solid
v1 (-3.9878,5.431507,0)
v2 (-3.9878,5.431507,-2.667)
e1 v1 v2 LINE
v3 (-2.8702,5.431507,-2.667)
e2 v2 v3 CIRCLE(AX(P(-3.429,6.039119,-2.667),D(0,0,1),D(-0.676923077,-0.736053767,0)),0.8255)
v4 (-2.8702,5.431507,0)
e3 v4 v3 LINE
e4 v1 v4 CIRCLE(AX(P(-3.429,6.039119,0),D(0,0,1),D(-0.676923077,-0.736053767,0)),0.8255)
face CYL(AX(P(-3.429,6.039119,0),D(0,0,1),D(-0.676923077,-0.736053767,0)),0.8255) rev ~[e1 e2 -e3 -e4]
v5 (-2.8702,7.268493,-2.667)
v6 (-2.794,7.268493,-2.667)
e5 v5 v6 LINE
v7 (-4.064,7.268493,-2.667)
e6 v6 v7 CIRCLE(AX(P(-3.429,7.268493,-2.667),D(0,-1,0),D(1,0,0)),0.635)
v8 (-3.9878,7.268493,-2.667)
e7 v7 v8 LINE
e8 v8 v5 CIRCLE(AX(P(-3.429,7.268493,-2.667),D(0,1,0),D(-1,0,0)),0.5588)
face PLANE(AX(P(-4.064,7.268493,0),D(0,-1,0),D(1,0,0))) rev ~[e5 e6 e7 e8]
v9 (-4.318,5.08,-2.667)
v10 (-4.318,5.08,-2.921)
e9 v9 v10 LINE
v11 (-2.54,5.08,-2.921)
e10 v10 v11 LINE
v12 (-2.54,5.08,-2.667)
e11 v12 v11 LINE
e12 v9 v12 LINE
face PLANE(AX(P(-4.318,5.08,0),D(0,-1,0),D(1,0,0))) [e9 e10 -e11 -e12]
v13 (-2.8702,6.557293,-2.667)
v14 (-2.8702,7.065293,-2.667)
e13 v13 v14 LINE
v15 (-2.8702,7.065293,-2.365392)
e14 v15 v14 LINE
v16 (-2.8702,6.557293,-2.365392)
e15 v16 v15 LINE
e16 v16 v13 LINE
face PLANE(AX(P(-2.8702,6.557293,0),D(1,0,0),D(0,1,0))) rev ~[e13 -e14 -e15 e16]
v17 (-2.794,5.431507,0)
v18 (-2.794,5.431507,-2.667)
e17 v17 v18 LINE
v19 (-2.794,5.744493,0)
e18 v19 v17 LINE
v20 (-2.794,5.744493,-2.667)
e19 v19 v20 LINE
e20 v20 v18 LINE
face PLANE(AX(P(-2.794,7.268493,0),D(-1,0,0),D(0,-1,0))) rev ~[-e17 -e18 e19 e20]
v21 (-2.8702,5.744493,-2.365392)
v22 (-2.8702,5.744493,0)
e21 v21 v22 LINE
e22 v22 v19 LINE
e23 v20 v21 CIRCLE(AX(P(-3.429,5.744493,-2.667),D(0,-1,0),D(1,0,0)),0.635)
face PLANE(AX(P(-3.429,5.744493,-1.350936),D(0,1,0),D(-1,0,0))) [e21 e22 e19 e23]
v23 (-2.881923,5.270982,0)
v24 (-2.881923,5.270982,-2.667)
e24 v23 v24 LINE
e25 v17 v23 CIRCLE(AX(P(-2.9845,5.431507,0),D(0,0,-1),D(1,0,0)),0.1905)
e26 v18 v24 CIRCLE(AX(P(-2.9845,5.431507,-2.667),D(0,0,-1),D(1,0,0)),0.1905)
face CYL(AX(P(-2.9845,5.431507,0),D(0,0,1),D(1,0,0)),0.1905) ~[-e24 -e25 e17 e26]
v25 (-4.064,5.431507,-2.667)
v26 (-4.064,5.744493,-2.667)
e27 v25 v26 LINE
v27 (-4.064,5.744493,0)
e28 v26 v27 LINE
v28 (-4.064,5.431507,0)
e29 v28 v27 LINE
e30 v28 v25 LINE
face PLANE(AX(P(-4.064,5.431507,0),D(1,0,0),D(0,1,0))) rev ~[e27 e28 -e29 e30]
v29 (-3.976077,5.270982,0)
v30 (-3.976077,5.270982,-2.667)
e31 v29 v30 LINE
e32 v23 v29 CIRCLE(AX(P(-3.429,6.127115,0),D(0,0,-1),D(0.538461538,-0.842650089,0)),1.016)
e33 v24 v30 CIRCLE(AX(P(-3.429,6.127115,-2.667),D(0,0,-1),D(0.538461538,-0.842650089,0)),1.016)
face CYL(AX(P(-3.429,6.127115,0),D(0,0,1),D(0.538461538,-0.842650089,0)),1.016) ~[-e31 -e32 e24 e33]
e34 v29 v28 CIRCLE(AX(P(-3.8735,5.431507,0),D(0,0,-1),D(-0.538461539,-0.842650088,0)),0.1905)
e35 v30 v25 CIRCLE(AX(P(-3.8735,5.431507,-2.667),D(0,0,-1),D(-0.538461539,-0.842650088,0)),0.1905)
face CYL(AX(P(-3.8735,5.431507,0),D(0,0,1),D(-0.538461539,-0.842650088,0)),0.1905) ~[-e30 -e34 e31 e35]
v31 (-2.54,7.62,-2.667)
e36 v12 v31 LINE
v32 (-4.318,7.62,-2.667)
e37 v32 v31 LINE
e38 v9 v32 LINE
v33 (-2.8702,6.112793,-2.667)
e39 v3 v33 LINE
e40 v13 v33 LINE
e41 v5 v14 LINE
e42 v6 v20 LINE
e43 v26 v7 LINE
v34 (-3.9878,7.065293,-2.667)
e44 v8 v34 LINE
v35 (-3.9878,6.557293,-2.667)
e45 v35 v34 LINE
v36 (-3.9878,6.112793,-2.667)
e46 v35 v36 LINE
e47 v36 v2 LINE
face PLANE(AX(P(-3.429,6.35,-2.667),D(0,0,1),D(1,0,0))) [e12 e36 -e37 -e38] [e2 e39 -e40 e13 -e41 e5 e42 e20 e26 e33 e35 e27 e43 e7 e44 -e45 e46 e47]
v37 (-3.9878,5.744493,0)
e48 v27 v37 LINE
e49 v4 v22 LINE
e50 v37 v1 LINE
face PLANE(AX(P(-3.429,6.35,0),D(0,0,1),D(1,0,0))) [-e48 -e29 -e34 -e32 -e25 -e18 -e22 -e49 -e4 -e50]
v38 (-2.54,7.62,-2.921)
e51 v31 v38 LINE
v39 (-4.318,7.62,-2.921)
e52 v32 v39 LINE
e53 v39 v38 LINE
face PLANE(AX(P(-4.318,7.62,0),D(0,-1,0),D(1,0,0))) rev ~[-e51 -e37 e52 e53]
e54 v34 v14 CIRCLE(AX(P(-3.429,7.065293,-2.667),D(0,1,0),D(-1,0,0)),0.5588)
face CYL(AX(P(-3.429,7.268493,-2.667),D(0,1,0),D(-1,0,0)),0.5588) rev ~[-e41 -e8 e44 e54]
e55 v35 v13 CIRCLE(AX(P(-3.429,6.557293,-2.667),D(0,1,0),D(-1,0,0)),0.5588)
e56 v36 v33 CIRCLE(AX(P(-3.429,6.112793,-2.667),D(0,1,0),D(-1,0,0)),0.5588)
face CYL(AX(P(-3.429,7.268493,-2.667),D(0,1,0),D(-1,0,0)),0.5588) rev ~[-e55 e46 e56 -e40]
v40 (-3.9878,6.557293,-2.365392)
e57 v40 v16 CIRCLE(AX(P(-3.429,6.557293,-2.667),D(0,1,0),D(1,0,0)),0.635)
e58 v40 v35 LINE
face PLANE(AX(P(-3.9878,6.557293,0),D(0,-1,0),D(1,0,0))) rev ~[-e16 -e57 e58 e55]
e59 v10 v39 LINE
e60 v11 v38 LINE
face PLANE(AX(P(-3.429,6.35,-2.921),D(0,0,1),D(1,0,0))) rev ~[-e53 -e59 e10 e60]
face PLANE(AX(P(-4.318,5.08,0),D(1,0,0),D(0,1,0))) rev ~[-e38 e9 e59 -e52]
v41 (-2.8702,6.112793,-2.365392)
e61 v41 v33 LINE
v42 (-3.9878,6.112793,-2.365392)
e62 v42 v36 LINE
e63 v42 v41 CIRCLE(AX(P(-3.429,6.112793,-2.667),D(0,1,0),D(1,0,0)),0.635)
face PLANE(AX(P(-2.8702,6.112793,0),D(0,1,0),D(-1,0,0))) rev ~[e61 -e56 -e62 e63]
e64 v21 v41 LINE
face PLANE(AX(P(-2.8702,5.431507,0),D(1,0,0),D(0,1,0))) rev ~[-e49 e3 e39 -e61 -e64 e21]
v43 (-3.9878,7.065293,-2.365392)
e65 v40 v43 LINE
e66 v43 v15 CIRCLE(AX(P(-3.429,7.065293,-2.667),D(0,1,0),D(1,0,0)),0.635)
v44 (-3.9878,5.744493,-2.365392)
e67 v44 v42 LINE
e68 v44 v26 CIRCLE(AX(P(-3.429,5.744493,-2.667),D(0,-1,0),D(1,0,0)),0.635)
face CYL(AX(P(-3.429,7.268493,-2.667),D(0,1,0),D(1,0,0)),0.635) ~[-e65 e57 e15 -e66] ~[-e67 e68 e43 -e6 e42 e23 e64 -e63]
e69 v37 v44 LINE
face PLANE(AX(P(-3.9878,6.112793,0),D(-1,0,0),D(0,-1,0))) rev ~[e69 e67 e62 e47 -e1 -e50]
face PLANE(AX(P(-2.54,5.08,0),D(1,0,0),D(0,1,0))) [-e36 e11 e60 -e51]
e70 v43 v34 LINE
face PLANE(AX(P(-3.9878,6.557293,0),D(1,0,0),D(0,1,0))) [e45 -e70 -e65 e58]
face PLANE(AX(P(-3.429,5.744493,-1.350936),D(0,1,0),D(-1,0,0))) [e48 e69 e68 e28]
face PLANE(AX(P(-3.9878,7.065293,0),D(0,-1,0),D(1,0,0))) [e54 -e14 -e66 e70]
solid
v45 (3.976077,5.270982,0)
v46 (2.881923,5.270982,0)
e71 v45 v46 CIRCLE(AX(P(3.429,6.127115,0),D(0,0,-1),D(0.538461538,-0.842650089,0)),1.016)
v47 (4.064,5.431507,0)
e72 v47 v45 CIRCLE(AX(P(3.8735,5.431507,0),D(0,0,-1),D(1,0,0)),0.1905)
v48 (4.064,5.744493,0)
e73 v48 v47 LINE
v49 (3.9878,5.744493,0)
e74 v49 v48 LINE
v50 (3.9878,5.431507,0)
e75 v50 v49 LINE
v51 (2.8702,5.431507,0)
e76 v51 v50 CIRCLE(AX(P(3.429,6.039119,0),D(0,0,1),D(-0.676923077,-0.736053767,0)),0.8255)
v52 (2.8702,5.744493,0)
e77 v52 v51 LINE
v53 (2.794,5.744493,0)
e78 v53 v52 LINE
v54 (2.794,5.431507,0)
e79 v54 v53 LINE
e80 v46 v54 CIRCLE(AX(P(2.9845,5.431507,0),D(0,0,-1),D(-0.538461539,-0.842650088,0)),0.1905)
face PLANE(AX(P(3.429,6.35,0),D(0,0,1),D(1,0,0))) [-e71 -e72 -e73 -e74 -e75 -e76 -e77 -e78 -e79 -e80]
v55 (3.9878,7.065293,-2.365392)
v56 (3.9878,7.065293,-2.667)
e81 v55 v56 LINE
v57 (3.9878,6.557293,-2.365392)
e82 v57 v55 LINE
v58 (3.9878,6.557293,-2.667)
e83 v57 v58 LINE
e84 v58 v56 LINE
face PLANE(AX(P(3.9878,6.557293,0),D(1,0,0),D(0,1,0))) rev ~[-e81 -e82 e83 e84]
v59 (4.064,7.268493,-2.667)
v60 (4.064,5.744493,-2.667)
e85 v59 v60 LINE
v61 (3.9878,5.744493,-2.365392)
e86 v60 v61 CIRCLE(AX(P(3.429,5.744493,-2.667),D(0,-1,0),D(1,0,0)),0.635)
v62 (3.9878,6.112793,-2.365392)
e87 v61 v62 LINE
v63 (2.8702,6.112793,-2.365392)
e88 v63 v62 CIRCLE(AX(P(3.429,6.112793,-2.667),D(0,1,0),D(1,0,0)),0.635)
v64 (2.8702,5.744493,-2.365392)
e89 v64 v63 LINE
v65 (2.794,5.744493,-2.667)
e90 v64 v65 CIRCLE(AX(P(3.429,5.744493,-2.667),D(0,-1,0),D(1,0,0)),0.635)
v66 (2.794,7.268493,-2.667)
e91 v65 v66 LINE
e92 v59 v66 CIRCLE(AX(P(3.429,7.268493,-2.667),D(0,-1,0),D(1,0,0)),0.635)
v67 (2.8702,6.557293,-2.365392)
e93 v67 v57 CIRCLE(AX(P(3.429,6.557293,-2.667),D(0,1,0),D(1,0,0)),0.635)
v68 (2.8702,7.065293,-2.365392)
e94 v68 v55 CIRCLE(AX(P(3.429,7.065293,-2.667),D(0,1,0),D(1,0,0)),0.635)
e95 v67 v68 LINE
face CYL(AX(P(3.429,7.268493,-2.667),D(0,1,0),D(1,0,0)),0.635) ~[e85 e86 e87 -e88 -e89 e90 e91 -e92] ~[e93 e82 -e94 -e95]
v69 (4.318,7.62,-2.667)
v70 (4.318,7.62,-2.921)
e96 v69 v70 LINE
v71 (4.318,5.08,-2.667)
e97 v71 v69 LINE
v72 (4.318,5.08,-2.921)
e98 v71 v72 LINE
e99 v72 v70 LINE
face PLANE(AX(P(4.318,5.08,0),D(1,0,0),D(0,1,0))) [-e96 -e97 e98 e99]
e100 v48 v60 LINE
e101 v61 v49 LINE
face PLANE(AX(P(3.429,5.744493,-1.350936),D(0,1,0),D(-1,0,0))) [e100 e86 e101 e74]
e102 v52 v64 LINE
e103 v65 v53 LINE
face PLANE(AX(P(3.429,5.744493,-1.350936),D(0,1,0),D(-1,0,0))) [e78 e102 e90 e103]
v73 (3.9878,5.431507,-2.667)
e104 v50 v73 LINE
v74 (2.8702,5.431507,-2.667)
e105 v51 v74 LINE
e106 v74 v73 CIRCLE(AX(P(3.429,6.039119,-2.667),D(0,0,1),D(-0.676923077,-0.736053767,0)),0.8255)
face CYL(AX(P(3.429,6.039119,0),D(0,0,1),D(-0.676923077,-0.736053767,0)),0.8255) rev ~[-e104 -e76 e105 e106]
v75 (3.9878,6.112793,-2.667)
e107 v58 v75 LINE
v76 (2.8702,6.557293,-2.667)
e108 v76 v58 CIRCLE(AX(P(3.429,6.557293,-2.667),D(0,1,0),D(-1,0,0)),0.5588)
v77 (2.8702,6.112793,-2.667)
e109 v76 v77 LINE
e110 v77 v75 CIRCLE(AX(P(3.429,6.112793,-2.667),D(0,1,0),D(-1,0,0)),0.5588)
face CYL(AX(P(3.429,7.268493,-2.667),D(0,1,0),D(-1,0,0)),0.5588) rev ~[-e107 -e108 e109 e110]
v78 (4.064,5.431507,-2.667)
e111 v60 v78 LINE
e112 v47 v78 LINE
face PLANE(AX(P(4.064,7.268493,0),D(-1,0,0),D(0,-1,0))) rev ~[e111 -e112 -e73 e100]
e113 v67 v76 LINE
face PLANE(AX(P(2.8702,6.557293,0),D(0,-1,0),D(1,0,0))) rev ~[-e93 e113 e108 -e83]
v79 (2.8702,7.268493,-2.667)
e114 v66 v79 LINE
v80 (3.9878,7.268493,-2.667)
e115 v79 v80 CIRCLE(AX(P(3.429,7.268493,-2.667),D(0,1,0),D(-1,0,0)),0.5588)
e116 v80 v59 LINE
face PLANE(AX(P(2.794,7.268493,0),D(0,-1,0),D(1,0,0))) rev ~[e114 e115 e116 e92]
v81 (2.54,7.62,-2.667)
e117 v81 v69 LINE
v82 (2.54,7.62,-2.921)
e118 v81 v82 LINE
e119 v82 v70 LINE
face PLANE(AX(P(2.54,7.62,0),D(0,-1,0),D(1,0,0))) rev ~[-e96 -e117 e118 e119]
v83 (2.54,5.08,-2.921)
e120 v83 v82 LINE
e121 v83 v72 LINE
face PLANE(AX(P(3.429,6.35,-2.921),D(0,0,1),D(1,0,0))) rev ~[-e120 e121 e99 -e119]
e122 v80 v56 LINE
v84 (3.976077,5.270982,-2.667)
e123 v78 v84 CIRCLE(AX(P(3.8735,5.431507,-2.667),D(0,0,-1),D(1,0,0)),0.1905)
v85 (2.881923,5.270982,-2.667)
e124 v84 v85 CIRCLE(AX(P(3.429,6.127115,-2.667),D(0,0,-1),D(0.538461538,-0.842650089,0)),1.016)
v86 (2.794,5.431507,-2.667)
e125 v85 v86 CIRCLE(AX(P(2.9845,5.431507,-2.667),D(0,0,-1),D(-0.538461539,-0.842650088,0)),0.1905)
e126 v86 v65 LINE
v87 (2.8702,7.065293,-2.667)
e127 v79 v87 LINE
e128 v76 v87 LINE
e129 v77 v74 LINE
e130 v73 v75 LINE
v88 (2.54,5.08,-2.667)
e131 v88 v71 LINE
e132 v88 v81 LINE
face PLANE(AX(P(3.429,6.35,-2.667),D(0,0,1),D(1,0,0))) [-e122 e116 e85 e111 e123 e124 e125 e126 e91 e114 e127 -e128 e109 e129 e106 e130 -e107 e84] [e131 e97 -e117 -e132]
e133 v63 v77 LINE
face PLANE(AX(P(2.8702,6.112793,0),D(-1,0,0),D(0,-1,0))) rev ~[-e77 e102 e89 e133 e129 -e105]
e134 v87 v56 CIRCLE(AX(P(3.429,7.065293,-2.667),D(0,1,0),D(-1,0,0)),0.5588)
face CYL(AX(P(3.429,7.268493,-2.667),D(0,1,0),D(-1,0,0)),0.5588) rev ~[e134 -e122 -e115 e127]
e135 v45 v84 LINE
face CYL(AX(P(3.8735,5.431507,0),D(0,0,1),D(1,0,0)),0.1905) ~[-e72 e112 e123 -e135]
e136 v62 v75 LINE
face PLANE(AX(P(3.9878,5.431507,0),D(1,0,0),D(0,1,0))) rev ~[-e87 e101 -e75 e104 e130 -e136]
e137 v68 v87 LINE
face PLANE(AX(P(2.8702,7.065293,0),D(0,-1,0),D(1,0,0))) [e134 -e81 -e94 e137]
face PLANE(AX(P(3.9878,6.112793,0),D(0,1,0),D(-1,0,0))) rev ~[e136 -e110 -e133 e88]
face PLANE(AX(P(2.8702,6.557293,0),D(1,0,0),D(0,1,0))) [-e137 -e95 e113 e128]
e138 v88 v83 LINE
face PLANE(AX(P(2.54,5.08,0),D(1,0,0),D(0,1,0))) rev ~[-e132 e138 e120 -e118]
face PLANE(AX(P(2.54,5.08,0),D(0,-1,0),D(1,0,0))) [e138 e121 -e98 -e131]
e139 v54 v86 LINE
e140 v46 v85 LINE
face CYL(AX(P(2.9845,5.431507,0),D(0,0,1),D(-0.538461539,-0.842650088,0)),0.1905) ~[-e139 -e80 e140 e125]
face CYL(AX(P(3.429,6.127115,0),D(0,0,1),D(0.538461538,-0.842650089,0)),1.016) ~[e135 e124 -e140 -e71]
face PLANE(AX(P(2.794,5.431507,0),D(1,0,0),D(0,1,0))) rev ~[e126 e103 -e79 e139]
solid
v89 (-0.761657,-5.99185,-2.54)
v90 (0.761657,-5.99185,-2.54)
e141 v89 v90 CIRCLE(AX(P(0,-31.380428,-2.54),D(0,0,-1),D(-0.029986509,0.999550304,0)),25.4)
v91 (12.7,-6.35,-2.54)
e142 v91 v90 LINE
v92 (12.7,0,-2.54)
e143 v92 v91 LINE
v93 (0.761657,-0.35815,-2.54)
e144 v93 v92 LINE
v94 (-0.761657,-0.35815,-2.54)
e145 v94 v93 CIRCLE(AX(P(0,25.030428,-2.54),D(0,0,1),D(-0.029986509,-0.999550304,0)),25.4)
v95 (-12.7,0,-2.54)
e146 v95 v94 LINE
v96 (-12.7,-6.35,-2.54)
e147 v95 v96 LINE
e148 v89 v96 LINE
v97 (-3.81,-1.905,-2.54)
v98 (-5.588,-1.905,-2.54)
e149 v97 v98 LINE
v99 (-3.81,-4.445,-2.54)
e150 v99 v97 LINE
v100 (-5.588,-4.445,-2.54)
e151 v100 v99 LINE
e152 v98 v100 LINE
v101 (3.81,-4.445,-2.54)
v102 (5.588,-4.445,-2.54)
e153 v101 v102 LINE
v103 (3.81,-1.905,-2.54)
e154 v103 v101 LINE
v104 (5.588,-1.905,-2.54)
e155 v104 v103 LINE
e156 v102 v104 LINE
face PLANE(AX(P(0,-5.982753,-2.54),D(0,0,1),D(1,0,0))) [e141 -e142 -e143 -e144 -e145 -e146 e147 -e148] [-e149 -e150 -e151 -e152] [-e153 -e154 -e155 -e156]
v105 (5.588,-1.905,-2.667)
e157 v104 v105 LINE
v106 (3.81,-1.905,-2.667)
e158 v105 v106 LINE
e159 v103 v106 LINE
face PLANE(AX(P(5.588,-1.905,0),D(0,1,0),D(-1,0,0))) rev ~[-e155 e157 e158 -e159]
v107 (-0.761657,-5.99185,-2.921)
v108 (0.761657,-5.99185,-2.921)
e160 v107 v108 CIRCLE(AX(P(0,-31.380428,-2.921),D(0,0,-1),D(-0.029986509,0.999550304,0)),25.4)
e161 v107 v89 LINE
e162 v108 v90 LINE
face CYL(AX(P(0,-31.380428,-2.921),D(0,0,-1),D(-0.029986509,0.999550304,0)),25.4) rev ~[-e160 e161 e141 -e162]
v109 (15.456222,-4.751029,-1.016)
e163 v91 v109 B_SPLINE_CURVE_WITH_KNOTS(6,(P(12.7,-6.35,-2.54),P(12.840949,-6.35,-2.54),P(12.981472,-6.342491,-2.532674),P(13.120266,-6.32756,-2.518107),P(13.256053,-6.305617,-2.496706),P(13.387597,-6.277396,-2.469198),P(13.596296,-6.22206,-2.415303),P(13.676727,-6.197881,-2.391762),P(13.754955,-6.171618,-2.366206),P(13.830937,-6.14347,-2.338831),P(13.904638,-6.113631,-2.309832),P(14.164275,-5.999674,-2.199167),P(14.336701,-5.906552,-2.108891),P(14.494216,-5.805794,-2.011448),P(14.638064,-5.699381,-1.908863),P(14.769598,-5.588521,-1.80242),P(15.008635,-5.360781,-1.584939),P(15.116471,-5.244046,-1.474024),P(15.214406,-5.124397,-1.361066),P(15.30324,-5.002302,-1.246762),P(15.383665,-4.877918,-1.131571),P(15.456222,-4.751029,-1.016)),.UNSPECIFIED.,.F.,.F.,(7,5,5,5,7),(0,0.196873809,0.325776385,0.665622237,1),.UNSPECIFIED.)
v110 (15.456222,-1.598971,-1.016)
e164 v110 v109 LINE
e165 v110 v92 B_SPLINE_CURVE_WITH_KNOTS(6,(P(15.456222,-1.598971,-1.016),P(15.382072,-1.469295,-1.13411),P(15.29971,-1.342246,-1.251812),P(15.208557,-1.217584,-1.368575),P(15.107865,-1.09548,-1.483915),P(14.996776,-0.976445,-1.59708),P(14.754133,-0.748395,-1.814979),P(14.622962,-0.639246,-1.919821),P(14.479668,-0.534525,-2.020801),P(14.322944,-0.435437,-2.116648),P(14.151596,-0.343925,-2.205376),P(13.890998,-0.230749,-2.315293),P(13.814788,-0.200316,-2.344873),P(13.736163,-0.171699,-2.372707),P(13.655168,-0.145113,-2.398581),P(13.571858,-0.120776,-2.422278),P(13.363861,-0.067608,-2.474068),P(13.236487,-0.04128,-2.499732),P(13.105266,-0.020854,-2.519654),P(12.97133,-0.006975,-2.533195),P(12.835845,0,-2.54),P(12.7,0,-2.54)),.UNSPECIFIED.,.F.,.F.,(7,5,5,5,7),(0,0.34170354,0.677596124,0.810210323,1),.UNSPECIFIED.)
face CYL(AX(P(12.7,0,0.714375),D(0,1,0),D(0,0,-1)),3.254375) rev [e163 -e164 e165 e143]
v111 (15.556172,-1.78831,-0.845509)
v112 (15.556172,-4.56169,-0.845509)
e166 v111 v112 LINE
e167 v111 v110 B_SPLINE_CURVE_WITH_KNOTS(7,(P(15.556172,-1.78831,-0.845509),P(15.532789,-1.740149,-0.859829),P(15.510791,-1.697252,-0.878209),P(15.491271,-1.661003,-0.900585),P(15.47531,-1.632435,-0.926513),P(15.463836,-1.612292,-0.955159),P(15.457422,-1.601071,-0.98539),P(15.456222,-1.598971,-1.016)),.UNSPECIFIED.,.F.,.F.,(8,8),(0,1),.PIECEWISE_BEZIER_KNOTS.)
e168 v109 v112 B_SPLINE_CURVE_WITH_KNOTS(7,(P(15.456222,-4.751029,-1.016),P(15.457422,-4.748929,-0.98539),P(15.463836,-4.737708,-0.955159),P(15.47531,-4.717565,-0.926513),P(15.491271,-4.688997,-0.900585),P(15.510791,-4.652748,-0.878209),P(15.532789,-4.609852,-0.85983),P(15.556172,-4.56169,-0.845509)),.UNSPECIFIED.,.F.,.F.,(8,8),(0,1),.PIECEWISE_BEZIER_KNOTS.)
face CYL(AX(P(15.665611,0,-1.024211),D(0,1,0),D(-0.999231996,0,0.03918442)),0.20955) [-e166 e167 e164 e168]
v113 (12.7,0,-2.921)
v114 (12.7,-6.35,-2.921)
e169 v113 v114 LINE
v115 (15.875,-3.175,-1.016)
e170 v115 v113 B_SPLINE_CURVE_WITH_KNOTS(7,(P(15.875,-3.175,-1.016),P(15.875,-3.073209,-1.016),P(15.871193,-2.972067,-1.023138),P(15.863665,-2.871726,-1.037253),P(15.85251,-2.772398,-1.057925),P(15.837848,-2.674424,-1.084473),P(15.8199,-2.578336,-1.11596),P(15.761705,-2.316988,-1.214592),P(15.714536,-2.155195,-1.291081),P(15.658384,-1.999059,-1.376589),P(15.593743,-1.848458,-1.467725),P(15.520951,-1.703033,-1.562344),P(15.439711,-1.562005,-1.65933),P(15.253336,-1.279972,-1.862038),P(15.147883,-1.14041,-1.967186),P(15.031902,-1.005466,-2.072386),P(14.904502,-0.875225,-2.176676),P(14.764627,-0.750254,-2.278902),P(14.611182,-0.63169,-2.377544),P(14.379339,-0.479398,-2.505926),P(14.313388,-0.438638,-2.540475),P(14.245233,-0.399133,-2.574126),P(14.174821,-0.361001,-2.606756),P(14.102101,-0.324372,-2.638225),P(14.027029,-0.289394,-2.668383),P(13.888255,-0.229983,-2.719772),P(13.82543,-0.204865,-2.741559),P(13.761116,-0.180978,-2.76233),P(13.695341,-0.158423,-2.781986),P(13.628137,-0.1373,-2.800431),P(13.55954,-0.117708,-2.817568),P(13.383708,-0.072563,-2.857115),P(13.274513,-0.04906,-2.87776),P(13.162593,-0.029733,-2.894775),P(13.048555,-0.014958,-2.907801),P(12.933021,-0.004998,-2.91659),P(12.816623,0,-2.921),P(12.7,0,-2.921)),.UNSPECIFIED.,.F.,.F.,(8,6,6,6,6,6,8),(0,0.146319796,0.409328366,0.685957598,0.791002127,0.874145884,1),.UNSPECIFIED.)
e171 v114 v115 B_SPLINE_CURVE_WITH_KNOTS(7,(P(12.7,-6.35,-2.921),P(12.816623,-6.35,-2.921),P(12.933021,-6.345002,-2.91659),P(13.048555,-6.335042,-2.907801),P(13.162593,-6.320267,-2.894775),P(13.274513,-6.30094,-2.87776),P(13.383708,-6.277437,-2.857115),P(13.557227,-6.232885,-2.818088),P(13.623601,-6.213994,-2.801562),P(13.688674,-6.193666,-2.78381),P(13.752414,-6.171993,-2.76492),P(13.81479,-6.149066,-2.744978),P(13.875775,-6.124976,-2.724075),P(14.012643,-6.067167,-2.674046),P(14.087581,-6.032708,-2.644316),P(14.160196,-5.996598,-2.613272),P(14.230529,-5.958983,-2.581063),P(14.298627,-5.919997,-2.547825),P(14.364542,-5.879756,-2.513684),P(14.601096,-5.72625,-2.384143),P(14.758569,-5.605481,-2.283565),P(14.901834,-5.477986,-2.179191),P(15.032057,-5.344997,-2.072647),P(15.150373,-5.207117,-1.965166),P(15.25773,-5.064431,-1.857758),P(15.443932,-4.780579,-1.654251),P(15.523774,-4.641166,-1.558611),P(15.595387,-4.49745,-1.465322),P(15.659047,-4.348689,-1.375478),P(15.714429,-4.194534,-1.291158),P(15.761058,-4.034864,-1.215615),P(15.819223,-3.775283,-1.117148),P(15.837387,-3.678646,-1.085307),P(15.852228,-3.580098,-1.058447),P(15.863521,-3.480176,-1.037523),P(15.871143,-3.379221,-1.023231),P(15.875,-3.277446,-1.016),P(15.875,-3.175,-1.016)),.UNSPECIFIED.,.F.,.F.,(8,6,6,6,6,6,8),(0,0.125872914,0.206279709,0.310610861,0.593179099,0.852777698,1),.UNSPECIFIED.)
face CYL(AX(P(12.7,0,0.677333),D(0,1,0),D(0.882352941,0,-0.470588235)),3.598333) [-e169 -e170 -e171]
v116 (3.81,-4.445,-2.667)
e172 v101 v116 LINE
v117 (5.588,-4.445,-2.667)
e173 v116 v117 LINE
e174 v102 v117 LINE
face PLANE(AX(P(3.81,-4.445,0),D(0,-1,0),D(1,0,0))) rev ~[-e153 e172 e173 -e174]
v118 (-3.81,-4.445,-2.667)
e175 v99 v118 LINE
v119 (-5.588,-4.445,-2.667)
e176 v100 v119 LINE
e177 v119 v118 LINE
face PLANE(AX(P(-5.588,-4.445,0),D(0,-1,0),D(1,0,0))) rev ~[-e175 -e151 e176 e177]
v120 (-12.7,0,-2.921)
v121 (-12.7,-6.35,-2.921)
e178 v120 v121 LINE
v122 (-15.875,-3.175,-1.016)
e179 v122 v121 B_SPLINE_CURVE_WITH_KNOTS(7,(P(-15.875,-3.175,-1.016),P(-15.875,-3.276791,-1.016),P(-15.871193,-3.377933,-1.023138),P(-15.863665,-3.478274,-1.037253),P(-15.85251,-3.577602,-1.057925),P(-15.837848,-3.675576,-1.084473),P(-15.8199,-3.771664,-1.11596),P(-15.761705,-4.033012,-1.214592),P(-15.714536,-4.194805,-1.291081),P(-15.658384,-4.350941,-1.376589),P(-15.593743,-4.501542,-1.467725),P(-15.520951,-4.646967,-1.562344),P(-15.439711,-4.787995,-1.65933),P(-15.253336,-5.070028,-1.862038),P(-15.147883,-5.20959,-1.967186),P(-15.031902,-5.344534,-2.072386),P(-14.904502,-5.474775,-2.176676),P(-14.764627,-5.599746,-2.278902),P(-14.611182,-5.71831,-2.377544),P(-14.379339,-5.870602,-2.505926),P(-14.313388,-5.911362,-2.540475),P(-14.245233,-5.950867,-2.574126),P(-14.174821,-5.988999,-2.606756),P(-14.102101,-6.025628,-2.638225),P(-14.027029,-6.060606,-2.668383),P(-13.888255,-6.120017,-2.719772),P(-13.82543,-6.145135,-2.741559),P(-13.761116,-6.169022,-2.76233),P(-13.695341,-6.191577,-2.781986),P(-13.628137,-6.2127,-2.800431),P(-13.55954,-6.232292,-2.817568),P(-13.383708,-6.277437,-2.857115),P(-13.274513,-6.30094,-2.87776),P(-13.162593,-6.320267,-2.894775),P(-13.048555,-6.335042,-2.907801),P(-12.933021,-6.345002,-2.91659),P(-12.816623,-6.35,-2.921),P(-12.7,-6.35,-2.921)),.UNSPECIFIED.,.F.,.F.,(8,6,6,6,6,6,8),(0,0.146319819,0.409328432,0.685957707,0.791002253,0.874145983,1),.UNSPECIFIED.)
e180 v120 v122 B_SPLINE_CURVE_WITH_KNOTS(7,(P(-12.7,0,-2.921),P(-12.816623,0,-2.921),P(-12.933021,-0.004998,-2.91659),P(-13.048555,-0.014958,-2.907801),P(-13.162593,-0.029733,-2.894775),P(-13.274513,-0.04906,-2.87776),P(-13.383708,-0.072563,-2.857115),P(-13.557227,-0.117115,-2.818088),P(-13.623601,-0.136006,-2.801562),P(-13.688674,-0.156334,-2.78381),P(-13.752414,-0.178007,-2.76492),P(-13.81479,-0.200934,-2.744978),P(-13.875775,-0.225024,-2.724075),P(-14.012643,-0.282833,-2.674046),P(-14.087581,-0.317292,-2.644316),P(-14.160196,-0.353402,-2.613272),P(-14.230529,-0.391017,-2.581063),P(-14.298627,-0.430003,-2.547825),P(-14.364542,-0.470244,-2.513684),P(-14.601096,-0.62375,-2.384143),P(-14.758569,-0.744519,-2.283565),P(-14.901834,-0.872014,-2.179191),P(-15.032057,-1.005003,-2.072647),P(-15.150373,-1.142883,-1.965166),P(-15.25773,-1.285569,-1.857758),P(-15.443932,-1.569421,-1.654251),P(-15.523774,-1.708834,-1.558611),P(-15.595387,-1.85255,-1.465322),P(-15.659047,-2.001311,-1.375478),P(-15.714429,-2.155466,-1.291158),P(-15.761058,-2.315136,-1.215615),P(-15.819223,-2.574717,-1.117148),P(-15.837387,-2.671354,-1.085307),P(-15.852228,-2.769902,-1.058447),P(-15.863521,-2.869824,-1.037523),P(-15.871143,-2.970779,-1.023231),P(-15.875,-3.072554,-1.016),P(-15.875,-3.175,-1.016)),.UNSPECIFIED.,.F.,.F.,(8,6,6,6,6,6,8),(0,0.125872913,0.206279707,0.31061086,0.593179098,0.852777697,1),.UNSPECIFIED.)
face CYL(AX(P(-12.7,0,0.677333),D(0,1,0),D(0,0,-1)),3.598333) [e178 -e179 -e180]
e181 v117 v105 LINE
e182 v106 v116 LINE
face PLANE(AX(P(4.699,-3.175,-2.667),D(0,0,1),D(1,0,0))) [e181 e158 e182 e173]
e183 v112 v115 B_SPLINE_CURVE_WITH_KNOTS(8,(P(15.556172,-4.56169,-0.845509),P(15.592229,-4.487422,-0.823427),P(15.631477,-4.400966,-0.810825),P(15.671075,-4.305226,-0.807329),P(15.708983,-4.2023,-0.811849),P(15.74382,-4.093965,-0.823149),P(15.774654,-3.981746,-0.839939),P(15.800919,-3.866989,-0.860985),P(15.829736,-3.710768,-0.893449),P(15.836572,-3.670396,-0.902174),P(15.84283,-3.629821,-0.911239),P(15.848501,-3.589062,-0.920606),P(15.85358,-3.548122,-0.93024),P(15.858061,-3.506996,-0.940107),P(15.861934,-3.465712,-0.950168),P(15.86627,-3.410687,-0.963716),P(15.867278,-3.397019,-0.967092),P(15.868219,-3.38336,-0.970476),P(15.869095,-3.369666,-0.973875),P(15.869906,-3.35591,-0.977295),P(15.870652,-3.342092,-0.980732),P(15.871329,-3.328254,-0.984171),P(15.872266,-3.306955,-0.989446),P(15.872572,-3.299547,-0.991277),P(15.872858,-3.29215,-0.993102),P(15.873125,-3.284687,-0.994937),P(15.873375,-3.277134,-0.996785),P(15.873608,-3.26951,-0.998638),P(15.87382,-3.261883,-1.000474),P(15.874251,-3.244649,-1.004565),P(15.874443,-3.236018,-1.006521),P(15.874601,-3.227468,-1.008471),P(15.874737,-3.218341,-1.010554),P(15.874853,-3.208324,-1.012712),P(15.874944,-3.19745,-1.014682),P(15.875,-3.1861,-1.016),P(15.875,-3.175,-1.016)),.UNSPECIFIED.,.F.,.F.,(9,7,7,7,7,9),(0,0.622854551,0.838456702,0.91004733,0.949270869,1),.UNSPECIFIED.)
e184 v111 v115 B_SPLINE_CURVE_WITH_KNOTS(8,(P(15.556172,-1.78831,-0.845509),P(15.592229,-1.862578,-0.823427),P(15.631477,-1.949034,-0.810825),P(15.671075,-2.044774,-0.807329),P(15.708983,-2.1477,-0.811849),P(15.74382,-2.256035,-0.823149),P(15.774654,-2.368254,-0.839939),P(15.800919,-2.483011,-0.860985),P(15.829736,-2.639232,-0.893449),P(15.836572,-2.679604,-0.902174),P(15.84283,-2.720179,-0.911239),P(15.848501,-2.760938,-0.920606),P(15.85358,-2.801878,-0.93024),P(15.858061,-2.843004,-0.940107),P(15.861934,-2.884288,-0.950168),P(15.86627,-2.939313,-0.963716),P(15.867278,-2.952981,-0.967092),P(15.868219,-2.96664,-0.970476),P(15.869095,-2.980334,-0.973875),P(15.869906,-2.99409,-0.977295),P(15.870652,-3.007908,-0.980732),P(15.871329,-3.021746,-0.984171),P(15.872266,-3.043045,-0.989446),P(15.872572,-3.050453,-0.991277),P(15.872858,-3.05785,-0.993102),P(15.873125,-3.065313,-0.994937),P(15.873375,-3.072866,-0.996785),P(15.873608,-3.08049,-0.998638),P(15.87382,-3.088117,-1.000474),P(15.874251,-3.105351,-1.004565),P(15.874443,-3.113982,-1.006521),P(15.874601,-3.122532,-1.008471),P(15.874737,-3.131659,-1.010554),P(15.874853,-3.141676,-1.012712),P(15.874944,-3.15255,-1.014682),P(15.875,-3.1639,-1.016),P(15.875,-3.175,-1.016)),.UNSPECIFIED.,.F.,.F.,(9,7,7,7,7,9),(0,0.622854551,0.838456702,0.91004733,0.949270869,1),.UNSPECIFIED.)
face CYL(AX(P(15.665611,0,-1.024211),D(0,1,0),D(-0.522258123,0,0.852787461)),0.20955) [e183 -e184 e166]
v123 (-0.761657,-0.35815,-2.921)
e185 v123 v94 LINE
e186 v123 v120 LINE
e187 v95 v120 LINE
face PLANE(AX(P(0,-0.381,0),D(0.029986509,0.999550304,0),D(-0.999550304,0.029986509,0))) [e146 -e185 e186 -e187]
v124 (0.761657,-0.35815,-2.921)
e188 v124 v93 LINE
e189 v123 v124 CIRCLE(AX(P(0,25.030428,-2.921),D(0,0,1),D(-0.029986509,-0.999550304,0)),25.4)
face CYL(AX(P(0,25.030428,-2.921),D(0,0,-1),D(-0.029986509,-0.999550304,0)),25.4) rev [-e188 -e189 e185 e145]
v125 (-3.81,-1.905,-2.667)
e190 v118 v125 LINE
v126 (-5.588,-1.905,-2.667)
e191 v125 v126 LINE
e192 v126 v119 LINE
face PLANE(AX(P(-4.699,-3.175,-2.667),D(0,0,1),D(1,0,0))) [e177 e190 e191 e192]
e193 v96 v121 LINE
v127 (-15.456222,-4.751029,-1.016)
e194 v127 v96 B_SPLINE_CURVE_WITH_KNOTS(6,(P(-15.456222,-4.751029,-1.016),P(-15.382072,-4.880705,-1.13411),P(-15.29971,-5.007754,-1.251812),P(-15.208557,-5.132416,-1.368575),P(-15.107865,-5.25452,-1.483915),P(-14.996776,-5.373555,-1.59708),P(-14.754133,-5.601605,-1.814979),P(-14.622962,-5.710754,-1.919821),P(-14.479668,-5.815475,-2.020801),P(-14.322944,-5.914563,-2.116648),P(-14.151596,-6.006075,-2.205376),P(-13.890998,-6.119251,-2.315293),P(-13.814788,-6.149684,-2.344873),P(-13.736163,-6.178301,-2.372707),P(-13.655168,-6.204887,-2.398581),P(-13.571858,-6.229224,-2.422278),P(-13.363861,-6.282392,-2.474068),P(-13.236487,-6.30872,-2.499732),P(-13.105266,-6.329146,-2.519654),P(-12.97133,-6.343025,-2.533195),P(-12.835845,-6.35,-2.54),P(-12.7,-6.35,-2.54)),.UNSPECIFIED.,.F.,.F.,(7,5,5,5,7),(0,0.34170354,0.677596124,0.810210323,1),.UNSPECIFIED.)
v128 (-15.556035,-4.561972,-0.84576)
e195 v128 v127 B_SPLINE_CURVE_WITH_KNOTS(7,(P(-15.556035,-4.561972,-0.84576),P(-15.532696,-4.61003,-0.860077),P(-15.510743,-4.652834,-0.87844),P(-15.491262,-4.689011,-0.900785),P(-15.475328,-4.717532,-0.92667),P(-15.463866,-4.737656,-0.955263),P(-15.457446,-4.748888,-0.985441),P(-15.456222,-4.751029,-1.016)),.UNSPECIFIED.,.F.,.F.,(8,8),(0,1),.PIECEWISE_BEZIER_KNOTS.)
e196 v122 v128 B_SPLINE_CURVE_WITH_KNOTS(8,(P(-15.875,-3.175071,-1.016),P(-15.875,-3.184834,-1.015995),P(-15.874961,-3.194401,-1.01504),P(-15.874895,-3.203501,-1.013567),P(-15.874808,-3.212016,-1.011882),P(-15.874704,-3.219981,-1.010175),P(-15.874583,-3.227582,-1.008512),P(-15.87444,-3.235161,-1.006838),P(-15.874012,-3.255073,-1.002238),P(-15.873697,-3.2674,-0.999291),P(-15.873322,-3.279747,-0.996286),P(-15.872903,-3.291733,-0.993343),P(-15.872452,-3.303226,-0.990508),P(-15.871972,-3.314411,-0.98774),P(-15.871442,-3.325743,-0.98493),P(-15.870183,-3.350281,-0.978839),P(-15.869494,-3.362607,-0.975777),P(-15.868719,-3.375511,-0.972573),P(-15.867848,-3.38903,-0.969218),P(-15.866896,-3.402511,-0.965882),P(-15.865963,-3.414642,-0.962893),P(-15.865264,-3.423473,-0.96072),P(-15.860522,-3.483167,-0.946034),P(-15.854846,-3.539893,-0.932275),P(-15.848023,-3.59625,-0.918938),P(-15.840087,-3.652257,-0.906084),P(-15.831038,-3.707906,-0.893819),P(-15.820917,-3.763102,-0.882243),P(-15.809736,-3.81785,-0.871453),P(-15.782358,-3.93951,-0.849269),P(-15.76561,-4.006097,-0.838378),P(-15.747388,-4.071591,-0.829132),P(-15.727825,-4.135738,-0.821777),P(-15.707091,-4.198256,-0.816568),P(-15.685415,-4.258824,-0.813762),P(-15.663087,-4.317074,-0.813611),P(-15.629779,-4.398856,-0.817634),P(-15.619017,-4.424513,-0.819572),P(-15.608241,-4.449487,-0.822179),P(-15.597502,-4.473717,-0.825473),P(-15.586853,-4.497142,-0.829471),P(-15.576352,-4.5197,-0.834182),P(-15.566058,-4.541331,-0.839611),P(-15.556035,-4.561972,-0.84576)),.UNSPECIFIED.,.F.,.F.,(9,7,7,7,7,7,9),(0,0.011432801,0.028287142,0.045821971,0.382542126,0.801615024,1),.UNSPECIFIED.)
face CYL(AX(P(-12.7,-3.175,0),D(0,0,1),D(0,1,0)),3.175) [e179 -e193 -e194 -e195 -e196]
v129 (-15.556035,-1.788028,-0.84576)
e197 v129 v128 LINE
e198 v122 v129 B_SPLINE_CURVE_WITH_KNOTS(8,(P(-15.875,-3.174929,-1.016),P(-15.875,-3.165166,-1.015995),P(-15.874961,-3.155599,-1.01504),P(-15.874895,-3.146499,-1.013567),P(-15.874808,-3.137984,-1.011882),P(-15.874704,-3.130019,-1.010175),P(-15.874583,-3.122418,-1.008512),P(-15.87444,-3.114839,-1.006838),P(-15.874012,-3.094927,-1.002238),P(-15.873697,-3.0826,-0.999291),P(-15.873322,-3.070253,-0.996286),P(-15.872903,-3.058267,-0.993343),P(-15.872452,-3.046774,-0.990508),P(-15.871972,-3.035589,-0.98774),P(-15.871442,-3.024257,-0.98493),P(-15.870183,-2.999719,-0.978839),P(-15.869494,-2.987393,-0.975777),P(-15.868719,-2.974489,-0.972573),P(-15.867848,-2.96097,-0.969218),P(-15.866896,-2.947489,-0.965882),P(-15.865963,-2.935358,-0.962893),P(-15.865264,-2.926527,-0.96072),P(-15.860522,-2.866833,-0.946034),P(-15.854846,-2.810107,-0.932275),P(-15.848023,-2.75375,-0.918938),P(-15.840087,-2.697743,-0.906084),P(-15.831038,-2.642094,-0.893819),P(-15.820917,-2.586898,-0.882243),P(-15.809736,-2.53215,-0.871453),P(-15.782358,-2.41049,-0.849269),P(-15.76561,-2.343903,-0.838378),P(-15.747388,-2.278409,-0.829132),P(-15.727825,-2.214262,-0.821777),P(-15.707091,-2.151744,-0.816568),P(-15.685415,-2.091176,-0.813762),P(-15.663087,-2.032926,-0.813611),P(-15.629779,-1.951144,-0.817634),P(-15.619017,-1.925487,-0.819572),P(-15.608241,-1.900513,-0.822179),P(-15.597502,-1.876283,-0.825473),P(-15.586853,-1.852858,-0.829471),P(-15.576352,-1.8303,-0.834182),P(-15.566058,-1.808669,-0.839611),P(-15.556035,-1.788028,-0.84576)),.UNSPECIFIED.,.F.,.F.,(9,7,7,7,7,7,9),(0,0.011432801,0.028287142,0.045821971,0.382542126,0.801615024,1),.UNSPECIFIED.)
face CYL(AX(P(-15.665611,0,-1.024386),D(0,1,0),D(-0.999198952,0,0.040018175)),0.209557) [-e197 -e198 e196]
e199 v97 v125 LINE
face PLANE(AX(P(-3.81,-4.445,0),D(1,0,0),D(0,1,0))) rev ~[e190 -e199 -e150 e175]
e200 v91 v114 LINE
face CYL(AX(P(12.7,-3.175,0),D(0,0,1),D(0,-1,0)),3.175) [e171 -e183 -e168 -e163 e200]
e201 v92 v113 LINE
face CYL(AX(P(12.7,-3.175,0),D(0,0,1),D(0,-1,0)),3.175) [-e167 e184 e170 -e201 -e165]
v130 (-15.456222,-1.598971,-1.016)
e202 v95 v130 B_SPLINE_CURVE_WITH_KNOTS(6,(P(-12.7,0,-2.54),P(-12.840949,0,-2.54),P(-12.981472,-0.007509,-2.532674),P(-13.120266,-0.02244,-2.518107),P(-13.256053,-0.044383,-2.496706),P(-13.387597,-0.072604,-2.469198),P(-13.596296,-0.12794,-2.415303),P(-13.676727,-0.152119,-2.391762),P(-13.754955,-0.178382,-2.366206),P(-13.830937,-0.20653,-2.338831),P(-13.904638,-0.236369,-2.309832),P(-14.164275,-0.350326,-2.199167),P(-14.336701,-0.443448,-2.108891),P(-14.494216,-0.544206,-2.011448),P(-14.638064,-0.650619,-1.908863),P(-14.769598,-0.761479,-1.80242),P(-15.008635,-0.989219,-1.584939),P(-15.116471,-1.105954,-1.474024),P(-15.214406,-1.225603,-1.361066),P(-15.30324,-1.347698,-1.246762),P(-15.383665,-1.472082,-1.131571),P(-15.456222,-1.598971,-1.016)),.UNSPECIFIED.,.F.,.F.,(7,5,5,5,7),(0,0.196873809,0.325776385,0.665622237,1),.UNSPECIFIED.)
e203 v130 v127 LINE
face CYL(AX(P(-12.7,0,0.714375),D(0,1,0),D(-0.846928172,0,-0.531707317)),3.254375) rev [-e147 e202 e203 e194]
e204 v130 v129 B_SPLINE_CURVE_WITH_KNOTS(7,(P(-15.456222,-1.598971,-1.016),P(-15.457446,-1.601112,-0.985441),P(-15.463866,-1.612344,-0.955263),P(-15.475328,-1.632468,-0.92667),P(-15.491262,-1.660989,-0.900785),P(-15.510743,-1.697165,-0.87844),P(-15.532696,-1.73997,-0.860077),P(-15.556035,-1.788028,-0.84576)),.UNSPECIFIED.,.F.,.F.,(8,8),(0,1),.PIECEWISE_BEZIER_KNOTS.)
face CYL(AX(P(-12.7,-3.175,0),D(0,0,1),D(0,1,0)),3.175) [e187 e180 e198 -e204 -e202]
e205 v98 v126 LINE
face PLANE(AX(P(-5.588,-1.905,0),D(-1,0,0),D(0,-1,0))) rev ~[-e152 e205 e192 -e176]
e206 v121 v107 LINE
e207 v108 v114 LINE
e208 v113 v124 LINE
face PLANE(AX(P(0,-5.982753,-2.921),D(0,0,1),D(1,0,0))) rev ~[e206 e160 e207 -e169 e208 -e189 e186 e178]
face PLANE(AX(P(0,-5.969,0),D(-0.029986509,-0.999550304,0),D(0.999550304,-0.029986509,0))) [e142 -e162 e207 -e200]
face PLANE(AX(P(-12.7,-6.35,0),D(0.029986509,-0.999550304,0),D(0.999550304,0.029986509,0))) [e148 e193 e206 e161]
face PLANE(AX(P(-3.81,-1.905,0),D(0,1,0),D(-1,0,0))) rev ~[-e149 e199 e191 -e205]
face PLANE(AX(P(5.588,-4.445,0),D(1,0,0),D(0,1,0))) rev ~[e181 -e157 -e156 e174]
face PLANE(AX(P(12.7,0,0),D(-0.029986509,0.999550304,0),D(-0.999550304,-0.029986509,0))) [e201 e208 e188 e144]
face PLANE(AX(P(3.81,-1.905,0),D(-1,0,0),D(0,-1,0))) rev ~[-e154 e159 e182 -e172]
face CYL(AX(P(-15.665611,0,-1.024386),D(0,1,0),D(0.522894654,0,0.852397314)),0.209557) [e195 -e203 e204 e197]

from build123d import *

# Parameters (mm, degrees)
F1_DEPTH    = 9.8425
F3_DEPTH    = 25.4
F5_DEPTH    = 2.667
F6_T1_DEPTH = 0.381
F0_W        = 1.778
F0_H        = 2.54
F0_W_2      = 1.1176
F0_H_2      = 0.508
F0_H_3      = 0.4445
F0_H_4      = 0.2032
F0_W_3      = 0.0762
F0_H_5      = 0.6812858045
F7_DEPTH    = 2.921
F8_DEPTH    = 2.667
F9_DEPTH    = 2.667
F12_DEPTH   = 1.524


# Not quite as in the source:
# - a fillet or chamfer that OpenCascade refuses, or shapes differently, is made with other operations: its cross-section is extruded or revolved along the edge and cut away or added


with BuildPart() as f1:
    # F0 (on Top) → F1 (new body)
    with BuildSketch(Plane.XY):
        with BuildLine():
            Line((-12.7, -6.35), (-12.7, 0))
            ThreePointArc((-12.7, 0), (-15.875, -3.175), (-12.7, -6.35))
        make_face()
        with BuildLine():
            ThreePointArc((12.7, -6.35), (15.875, -3.175), (12.7, 0))
            Line((12.7, 0), (12.7, -6.35))
        make_face()
        Polygon((-6.35, -0.1905), (-12.7, 0), (-12.7, -6.35), (-6.35, -6.1595), (0, -5.969), (6.35, -6.1595), (12.7, -6.35), (12.7, 0), (6.35, -0.1905), (0, -0.381), align=None)
    extrude(amount=-F1_DEPTH)

    # F2 (on Front) → F3 (cut)
    with BuildSketch(Plane.XZ):
        with BuildLine():
            Line((-12.7, -2.54), (0, -2.54))
            Line((0, -2.54), (12.7, -2.54))
            ThreePointArc((12.7, -2.54), (14.2747487895, -2.1336283165), (15.4562218706, -1.016))
            ThreePointArc((15.4562218706, -1.016), (15.4848358871, -0.9182319253), (15.5561717457, -0.8455094828))
            ThreePointArc((15.5561717457, -0.8455094828), (15.745074667, -0.4338744994), (15.875, 0))
            Line((15.875, 0), (-15.875, 0))
            ThreePointArc((-15.875, 0), (-15.7450242413, -0.4340082159), (-15.556034737, -0.8457603215))
            ThreePointArc((-15.556034737, -0.8457603215), (-15.484834563, -0.9183954726), (-15.4562218706, -1.016))
            ThreePointArc((-15.4562218706, -1.016), (-14.2747487895, -2.1336283165), (-12.7, -2.54))
        make_face()
        with BuildLine():
            ThreePointArc((-15.875, -1.016), (-15.7642823045, -0.8395129732), (-15.556034737, -0.8457603215))
            ThreePointArc((-15.556034737, -0.8457603215), (-15.7450242413, -0.4340082159), (-15.875, 0))
            Line((-15.875, 0), (-15.875, -1.016))
        make_face()
        with BuildLine():
            ThreePointArc((-12.7, -2.921), (-14.5513272266, -2.4082120444), (-15.875, -1.016))
            Line((-15.875, -1.016), (-15.875, -9.8425))
            Line((-15.875, -9.8425), (15.875, -9.8425))
            Line((15.875, -9.8425), (15.875, -1.016))
            ThreePointArc((15.875, -1.016), (14.5513272266, -2.4082120444), (12.7, -2.921))
            Line((12.7, -2.921), (0, -2.921))
            Line((0, -2.921), (-12.7, -2.921))
        make_face()
        with BuildLine():
            ThreePointArc((15.875, 0), (15.745074667, -0.4338744994), (15.5561717457, -0.8455094828))
            ThreePointArc((15.5561717457, -0.8455094828), (15.7644251473, -0.8394221507), (15.875, -1.016))
            Line((15.875, -1.016), (15.875, 0))
        make_face()
    extrude(amount=F3_DEPTH, mode=Mode.SUBTRACT)

    # F4 (on Top) → F5 (cut)
    with BuildSketch(Plane.XY):
        Polygon((-3.81, -4.445), (-3.81, -3.175), (-3.81, -1.905), (-5.588, -1.905), (-5.588, -4.445), align=None)
        Polygon((3.81, -1.905), (3.81, -3.175), (3.81, -4.445), (5.588, -4.445), (5.588, -1.905), align=None)
    extrude(amount=-F5_DEPTH, mode=Mode.SUBTRACT)

    # F6: fillet of radius 25.4 on 2 edges, made by hand

    # F6_s2 → F6_t1 (join)
    with BuildSketch(Plane.XY.offset(-2.921)):
        with BuildLine():
            ThreePointArc((-0.7616573313, -5.9918497199), (0, -5.9804274294), (0.7616573313, -5.9918497199))
            Line((0.7616573313, -5.9918497199), (0, -5.969))
            Line((0, -5.969), (-0.7616573313, -5.9918497199))
        make_face()
        with BuildLine():
            ThreePointArc((-0.7616573313, -0.3581502801), (0, -0.3695725706), (0.7616573313, -0.3581502801))
            Line((0.7616573313, -0.3581502801), (0, -0.381))
            Line((0, -0.381), (-0.7616573313, -0.3581502801))
        make_face()
    extrude(amount=F6_T1_DEPTH)


with BuildPart() as f7:
    # F0 (on Top) → F7 (new body)
    with BuildSketch(Plane.XY):
        with Locations((3.429, 6.35)):
            Rectangle(F0_W, F0_H)
        with BuildLine():
            Line((4.064, 6.1127929022), (4.064, 5.4315070978))
            ThreePointArc((4.064, 5.4315070978), (4.0405795527, 5.3399938579), (3.9760769231, 5.2709822559))
            ThreePointArc((3.9760769231, 5.2709822559), (3.429, 5.1111147458), (2.8819230769, 5.2709822559))
            ThreePointArc((2.8819230769, 5.2709822559), (2.8174204473, 5.3399938579), (2.794, 5.4315070978))
            Line((2.794, 5.4315070978), (2.794, 6.1127929022))
            Line((2.794, 6.1127929022), (2.794, 6.5572929022))
            Line((2.794, 6.5572929022), (2.794, 7.0652929022))
            Line((2.794, 7.0652929022), (2.794, 7.2684929022))
            ThreePointArc((2.794, 7.2684929022), (2.8174204473, 7.3600061421), (2.8819230769, 7.4290177441))
            ThreePointArc((2.8819230769, 7.4290177441), (3.429, 7.5888852542), (3.9760769231, 7.4290177441))
            ThreePointArc((3.9760769231, 7.4290177441), (4.0405795527, 7.3600061421), (4.064, 7.2684929022))
            Line((4.064, 7.2684929022), (4.064, 7.0652929022))
            Line((4.064, 7.0652929022), (4.064, 6.5572929022))
            Line((4.064, 6.5572929022), (4.064, 6.1127929022))
        make_face(mode=Mode.SUBTRACT)
        with BuildLine():
            ThreePointArc((2.8702, 5.4315070978), (3.429, 5.2136194824), (3.9878, 5.4315070978))
            Line((3.9878, 5.4315070978), (3.9878, 6.1127929022))
            Line((3.9878, 6.1127929022), (2.8702, 6.1127929022))
            Line((2.8702, 6.1127929022), (2.8702, 5.4315070978))
        make_face()
        with Locations((3.429, 6.8112929022)):
            Rectangle(F0_W_2, F0_H_2)
        with Locations((3.429, 6.3350429022)):
            Rectangle(F0_W_2, F0_H_3)
        with BuildLine():
            Line((3.9878, 7.2684929022), (4.064, 7.2684929022))
            ThreePointArc((4.064, 7.2684929022), (4.0405795527, 7.3600061421), (3.9760769231, 7.4290177441))
            ThreePointArc((3.9760769231, 7.4290177441), (3.429, 7.5888852542), (2.8819230769, 7.4290177441))
            ThreePointArc((2.8819230769, 7.4290177441), (2.8174204473, 7.3600061421), (2.794, 7.2684929022))
            Line((2.794, 7.2684929022), (2.8702, 7.2684929022))
            Line((2.8702, 7.2684929022), (3.9878, 7.2684929022))
        make_face()
        with Locations((3.429, 7.1668929022)):
            Rectangle(F0_W_2, F0_H_4)
        with BuildLine():
            ThreePointArc((3.9760769231, 5.2709822559), (4.0405795527, 5.3399938579), (4.064, 5.4315070978))
            Line((4.064, 5.4315070978), (3.9878, 5.4315070978))
            ThreePointArc((3.9878, 5.4315070978), (3.429, 5.2136194824), (2.8702, 5.4315070978))
            Line((2.8702, 5.4315070978), (2.794, 5.4315070978))
            ThreePointArc((2.794, 5.4315070978), (2.8174204473, 5.3399938579), (2.8819230769, 5.2709822559))
            ThreePointArc((2.8819230769, 5.2709822559), (3.429, 5.1111147458), (3.9760769231, 5.2709822559))
        make_face()
        with Locations((4.0259, 5.77215)):
            Rectangle(F0_W_3, F0_H_5)
        with Locations((2.8321, 5.77215)):
            Rectangle(F0_W_3, F0_H_5)
        with Locations((2.8321, 6.8112929022)):
            Rectangle(F0_W_3, F0_H_2)
        with Locations((4.0259, 6.8112929022)):
            Rectangle(F0_W_3, F0_H_2)
        with Locations((4.0259, 6.3350429022)):
            Rectangle(F0_W_3, F0_H_3)
        with Locations((2.8321, 6.3350429022)):
            Rectangle(F0_W_3, F0_H_3)
        with Locations((2.8321, 7.1668929022)):
            Rectangle(F0_W_3, F0_H_4)
        with Locations((4.0259, 7.1668929022)):
            Rectangle(F0_W_3, F0_H_4)
    extrude(amount=-F7_DEPTH)

    # F0 (on Top) → F9 (cut)
    with BuildSketch(Plane.XY):
        with Locations((3.429, 6.35)):
            Rectangle(F0_W, F0_H)
        with BuildLine():
            Line((4.064, 6.1127929022), (4.064, 5.4315070978))
            ThreePointArc((4.064, 5.4315070978), (4.0405795527, 5.3399938579), (3.9760769231, 5.2709822559))
            ThreePointArc((3.9760769231, 5.2709822559), (3.429, 5.1111147458), (2.8819230769, 5.2709822559))
            ThreePointArc((2.8819230769, 5.2709822559), (2.8174204473, 5.3399938579), (2.794, 5.4315070978))
            Line((2.794, 5.4315070978), (2.794, 6.1127929022))
            Line((2.794, 6.1127929022), (2.794, 6.5572929022))
            Line((2.794, 6.5572929022), (2.794, 7.0652929022))
            Line((2.794, 7.0652929022), (2.794, 7.2684929022))
            ThreePointArc((2.794, 7.2684929022), (2.8174204473, 7.3600061421), (2.8819230769, 7.4290177441))
            ThreePointArc((2.8819230769, 7.4290177441), (3.429, 7.5888852542), (3.9760769231, 7.4290177441))
            ThreePointArc((3.9760769231, 7.4290177441), (4.0405795527, 7.3600061421), (4.064, 7.2684929022))
            Line((4.064, 7.2684929022), (4.064, 7.0652929022))
            Line((4.064, 7.0652929022), (4.064, 6.5572929022))
            Line((4.064, 6.5572929022), (4.064, 6.1127929022))
        make_face(mode=Mode.SUBTRACT)
        with BuildLine():
            ThreePointArc((2.8702, 5.4315070978), (3.429, 5.2136194824), (3.9878, 5.4315070978))
            Line((3.9878, 5.4315070978), (3.9878, 6.1127929022))
            Line((3.9878, 6.1127929022), (2.8702, 6.1127929022))
            Line((2.8702, 6.1127929022), (2.8702, 5.4315070978))
        make_face()
        with Locations((3.429, 6.8112929022)):
            Rectangle(F0_W_2, F0_H_2)
        with BuildLine():
            Line((3.9878, 7.2684929022), (4.064, 7.2684929022))
            ThreePointArc((4.064, 7.2684929022), (4.0405795527, 7.3600061421), (3.9760769231, 7.4290177441))
            ThreePointArc((3.9760769231, 7.4290177441), (3.429, 7.5888852542), (2.8819230769, 7.4290177441))
            ThreePointArc((2.8819230769, 7.4290177441), (2.8174204473, 7.3600061421), (2.794, 7.2684929022))
            Line((2.794, 7.2684929022), (2.8702, 7.2684929022))
            Line((2.8702, 7.2684929022), (3.9878, 7.2684929022))
        make_face()
    extrude(amount=-F9_DEPTH, mode=Mode.SUBTRACT)


with BuildPart() as f7b:
    # F0 (on Top) → F7, piece 2 (new body)
    with BuildSketch(Plane.XY):
        with Locations((-3.429, 6.35)):
            Rectangle(F0_W, F0_H)
        with BuildLine():
            ThreePointArc((-2.8819230769, 5.2709822559), (-3.429, 5.1111147458), (-3.9760769231, 5.2709822559))
            ThreePointArc((-3.9760769231, 5.2709822559), (-4.0405795527, 5.3399938579), (-4.064, 5.4315070978))
            Line((-4.064, 5.4315070978), (-4.064, 6.1127929022))
            Line((-4.064, 6.1127929022), (-4.064, 6.5572929022))
            Line((-4.064, 6.5572929022), (-4.064, 7.0652929022))
            Line((-4.064, 7.0652929022), (-4.064, 7.2684929022))
            ThreePointArc((-4.064, 7.2684929022), (-4.0405795527, 7.3600061421), (-3.9760769231, 7.4290177441))
            ThreePointArc((-3.9760769231, 7.4290177441), (-3.429, 7.5888852542), (-2.8819230769, 7.4290177441))
            ThreePointArc((-2.8819230769, 7.4290177441), (-2.8174204473, 7.3600061421), (-2.794, 7.2684929022))
            Line((-2.794, 7.2684929022), (-2.794, 7.0652929022))
            Line((-2.794, 7.0652929022), (-2.794, 6.5572929022))
            Line((-2.794, 6.5572929022), (-2.794, 6.1127929022))
            Line((-2.794, 6.1127929022), (-2.794, 5.4315070978))
            ThreePointArc((-2.794, 5.4315070978), (-2.8174204473, 5.3399938579), (-2.8819230769, 5.2709822559))
        make_face(mode=Mode.SUBTRACT)
        with BuildLine():
            Line((-3.9878, 6.1127929022), (-3.9878, 5.4315070978))
            ThreePointArc((-3.9878, 5.4315070978), (-3.429, 5.2136194824), (-2.8702, 5.4315070978))
            Line((-2.8702, 5.4315070978), (-2.8702, 6.1127929022))
            Line((-2.8702, 6.1127929022), (-3.9878, 6.1127929022))
        make_face()
        with Locations((-3.429, 6.8112929022)):
            Rectangle(F0_W_2, F0_H_2)
        with Locations((-3.429, 6.3350429022)):
            Rectangle(F0_W_2, F0_H_3)
        with BuildLine():
            ThreePointArc((-3.9760769231, 7.4290177441), (-4.0405795527, 7.3600061421), (-4.064, 7.2684929022))
            Line((-4.064, 7.2684929022), (-3.9878, 7.2684929022))
            Line((-3.9878, 7.2684929022), (-2.8702, 7.2684929022))
            Line((-2.8702, 7.2684929022), (-2.794, 7.2684929022))
            ThreePointArc((-2.794, 7.2684929022), (-2.8174204473, 7.3600061421), (-2.8819230769, 7.4290177441))
            ThreePointArc((-2.8819230769, 7.4290177441), (-3.429, 7.5888852542), (-3.9760769231, 7.4290177441))
        make_face()
        with Locations((-3.429, 7.1668929022)):
            Rectangle(F0_W_2, F0_H_4)
        with BuildLine():
            ThreePointArc((-4.064, 5.4315070978), (-4.0405795527, 5.3399938579), (-3.9760769231, 5.2709822559))
            ThreePointArc((-3.9760769231, 5.2709822559), (-3.429, 5.1111147458), (-2.8819230769, 5.2709822559))
            ThreePointArc((-2.8819230769, 5.2709822559), (-2.8174204473, 5.3399938579), (-2.794, 5.4315070978))
            Line((-2.794, 5.4315070978), (-2.8702, 5.4315070978))
            ThreePointArc((-2.8702, 5.4315070978), (-3.429, 5.2136194824), (-3.9878, 5.4315070978))
            Line((-3.9878, 5.4315070978), (-4.064, 5.4315070978))
        make_face()
        with Locations((-4.0259, 5.77215)):
            Rectangle(F0_W_3, F0_H_5)
        with Locations((-2.8321, 5.77215)):
            Rectangle(F0_W_3, F0_H_5)
        with Locations((-2.8321, 6.8112929022)):
            Rectangle(F0_W_3, F0_H_2)
        with Locations((-4.0259, 6.8112929022)):
            Rectangle(F0_W_3, F0_H_2)
        with Locations((-4.0259, 6.3350429022)):
            Rectangle(F0_W_3, F0_H_3)
        with Locations((-2.8321, 6.3350429022)):
            Rectangle(F0_W_3, F0_H_3)
        with Locations((-4.0259, 7.1668929022)):
            Rectangle(F0_W_3, F0_H_4)
        with Locations((-2.8321, 7.1668929022)):
            Rectangle(F0_W_3, F0_H_4)
    extrude(amount=-F7_DEPTH)

    # F0 (on Top) → F8 (cut)
    with BuildSketch(Plane.XY):
        with Locations((-3.429, 6.35)):
            Rectangle(F0_W, F0_H)
        with BuildLine():
            ThreePointArc((-2.8819230769, 5.2709822559), (-3.429, 5.1111147458), (-3.9760769231, 5.2709822559))
            ThreePointArc((-3.9760769231, 5.2709822559), (-4.0405795527, 5.3399938579), (-4.064, 5.4315070978))
            Line((-4.064, 5.4315070978), (-4.064, 6.1127929022))
            Line((-4.064, 6.1127929022), (-4.064, 6.5572929022))
            Line((-4.064, 6.5572929022), (-4.064, 7.0652929022))
            Line((-4.064, 7.0652929022), (-4.064, 7.2684929022))
            ThreePointArc((-4.064, 7.2684929022), (-4.0405795527, 7.3600061421), (-3.9760769231, 7.4290177441))
            ThreePointArc((-3.9760769231, 7.4290177441), (-3.429, 7.5888852542), (-2.8819230769, 7.4290177441))
            ThreePointArc((-2.8819230769, 7.4290177441), (-2.8174204473, 7.3600061421), (-2.794, 7.2684929022))
            Line((-2.794, 7.2684929022), (-2.794, 7.0652929022))
            Line((-2.794, 7.0652929022), (-2.794, 6.5572929022))
            Line((-2.794, 6.5572929022), (-2.794, 6.1127929022))
            Line((-2.794, 6.1127929022), (-2.794, 5.4315070978))
            ThreePointArc((-2.794, 5.4315070978), (-2.8174204473, 5.3399938579), (-2.8819230769, 5.2709822559))
        make_face(mode=Mode.SUBTRACT)
        with BuildLine():
            Line((-3.9878, 6.1127929022), (-3.9878, 5.4315070978))
            ThreePointArc((-3.9878, 5.4315070978), (-3.429, 5.2136194824), (-2.8702, 5.4315070978))
            Line((-2.8702, 5.4315070978), (-2.8702, 6.1127929022))
            Line((-2.8702, 6.1127929022), (-3.9878, 6.1127929022))
        make_face()
        with Locations((-3.429, 6.8112929022)):
            Rectangle(F0_W_2, F0_H_2)
        with BuildLine():
            ThreePointArc((-3.9760769231, 7.4290177441), (-4.0405795527, 7.3600061421), (-4.064, 7.2684929022))
            Line((-4.064, 7.2684929022), (-3.9878, 7.2684929022))
            Line((-3.9878, 7.2684929022), (-2.8702, 7.2684929022))
            Line((-2.8702, 7.2684929022), (-2.794, 7.2684929022))
            ThreePointArc((-2.794, 7.2684929022), (-2.8174204473, 7.3600061421), (-2.8819230769, 7.4290177441))
            ThreePointArc((-2.8819230769, 7.4290177441), (-3.429, 7.5888852542), (-3.9760769231, 7.4290177441))
        make_face()
    extrude(amount=-F8_DEPTH, mode=Mode.SUBTRACT)


with BuildPart() as f12_tool:
    # F11 (on face) + F10 (on face) → F12 (new body)
    with BuildSketch(Plane(origin=(0, 7.2684929022, 0), x_dir=(-1, 0, 0), z_dir=(0, 1, 0))):
        with BuildLine():
            ThreePointArc((-2.8702, -2.667), (-3.429, -2.1082), (-3.9878, -2.667))
            Line((-3.9878, -2.667), (-2.8702, -2.667))
        make_face()
        with BuildLine():
            Line((-4.064, 0), (-4.064, -2.667))
            ThreePointArc((-4.064, -2.667), (-3.429, -2.032), (-2.794, -2.667))
            Line((-2.794, -2.667), (-2.794, 0))
            Line((-2.794, 0), (-4.064, 0))
        make_face()
    with BuildSketch(Plane(origin=(0, 7.2684929022, 0), x_dir=(-1, 0, 0), z_dir=(0, 1, 0))):
        with BuildLine():
            Line((2.8702, -2.667), (3.9878, -2.667))
            ThreePointArc((3.9878, -2.667), (3.429, -2.1082), (2.8702, -2.667))
        make_face()
        with BuildLine():
            ThreePointArc((2.794, -2.667), (3.429, -2.032), (4.064, -2.667))
            Line((4.064, -2.667), (4.064, 0))
            Line((4.064, 0), (2.794, 0))
            Line((2.794, 0), (2.794, -2.667))
        make_face()
    extrude(amount=-F12_DEPTH)


with BuildPart() as f7_1:
    add(f7.part)

    # F12: cut by f12_tool
    add(f12_tool.part, mode=Mode.SUBTRACT)


with BuildPart() as f7b_1:
    add(f7b.part)

    # F12: cut by f12_tool
    add(f12_tool.part, mode=Mode.SUBTRACT)


solid = Compound([f1.part, f7_1.part, f7b_1.part])
